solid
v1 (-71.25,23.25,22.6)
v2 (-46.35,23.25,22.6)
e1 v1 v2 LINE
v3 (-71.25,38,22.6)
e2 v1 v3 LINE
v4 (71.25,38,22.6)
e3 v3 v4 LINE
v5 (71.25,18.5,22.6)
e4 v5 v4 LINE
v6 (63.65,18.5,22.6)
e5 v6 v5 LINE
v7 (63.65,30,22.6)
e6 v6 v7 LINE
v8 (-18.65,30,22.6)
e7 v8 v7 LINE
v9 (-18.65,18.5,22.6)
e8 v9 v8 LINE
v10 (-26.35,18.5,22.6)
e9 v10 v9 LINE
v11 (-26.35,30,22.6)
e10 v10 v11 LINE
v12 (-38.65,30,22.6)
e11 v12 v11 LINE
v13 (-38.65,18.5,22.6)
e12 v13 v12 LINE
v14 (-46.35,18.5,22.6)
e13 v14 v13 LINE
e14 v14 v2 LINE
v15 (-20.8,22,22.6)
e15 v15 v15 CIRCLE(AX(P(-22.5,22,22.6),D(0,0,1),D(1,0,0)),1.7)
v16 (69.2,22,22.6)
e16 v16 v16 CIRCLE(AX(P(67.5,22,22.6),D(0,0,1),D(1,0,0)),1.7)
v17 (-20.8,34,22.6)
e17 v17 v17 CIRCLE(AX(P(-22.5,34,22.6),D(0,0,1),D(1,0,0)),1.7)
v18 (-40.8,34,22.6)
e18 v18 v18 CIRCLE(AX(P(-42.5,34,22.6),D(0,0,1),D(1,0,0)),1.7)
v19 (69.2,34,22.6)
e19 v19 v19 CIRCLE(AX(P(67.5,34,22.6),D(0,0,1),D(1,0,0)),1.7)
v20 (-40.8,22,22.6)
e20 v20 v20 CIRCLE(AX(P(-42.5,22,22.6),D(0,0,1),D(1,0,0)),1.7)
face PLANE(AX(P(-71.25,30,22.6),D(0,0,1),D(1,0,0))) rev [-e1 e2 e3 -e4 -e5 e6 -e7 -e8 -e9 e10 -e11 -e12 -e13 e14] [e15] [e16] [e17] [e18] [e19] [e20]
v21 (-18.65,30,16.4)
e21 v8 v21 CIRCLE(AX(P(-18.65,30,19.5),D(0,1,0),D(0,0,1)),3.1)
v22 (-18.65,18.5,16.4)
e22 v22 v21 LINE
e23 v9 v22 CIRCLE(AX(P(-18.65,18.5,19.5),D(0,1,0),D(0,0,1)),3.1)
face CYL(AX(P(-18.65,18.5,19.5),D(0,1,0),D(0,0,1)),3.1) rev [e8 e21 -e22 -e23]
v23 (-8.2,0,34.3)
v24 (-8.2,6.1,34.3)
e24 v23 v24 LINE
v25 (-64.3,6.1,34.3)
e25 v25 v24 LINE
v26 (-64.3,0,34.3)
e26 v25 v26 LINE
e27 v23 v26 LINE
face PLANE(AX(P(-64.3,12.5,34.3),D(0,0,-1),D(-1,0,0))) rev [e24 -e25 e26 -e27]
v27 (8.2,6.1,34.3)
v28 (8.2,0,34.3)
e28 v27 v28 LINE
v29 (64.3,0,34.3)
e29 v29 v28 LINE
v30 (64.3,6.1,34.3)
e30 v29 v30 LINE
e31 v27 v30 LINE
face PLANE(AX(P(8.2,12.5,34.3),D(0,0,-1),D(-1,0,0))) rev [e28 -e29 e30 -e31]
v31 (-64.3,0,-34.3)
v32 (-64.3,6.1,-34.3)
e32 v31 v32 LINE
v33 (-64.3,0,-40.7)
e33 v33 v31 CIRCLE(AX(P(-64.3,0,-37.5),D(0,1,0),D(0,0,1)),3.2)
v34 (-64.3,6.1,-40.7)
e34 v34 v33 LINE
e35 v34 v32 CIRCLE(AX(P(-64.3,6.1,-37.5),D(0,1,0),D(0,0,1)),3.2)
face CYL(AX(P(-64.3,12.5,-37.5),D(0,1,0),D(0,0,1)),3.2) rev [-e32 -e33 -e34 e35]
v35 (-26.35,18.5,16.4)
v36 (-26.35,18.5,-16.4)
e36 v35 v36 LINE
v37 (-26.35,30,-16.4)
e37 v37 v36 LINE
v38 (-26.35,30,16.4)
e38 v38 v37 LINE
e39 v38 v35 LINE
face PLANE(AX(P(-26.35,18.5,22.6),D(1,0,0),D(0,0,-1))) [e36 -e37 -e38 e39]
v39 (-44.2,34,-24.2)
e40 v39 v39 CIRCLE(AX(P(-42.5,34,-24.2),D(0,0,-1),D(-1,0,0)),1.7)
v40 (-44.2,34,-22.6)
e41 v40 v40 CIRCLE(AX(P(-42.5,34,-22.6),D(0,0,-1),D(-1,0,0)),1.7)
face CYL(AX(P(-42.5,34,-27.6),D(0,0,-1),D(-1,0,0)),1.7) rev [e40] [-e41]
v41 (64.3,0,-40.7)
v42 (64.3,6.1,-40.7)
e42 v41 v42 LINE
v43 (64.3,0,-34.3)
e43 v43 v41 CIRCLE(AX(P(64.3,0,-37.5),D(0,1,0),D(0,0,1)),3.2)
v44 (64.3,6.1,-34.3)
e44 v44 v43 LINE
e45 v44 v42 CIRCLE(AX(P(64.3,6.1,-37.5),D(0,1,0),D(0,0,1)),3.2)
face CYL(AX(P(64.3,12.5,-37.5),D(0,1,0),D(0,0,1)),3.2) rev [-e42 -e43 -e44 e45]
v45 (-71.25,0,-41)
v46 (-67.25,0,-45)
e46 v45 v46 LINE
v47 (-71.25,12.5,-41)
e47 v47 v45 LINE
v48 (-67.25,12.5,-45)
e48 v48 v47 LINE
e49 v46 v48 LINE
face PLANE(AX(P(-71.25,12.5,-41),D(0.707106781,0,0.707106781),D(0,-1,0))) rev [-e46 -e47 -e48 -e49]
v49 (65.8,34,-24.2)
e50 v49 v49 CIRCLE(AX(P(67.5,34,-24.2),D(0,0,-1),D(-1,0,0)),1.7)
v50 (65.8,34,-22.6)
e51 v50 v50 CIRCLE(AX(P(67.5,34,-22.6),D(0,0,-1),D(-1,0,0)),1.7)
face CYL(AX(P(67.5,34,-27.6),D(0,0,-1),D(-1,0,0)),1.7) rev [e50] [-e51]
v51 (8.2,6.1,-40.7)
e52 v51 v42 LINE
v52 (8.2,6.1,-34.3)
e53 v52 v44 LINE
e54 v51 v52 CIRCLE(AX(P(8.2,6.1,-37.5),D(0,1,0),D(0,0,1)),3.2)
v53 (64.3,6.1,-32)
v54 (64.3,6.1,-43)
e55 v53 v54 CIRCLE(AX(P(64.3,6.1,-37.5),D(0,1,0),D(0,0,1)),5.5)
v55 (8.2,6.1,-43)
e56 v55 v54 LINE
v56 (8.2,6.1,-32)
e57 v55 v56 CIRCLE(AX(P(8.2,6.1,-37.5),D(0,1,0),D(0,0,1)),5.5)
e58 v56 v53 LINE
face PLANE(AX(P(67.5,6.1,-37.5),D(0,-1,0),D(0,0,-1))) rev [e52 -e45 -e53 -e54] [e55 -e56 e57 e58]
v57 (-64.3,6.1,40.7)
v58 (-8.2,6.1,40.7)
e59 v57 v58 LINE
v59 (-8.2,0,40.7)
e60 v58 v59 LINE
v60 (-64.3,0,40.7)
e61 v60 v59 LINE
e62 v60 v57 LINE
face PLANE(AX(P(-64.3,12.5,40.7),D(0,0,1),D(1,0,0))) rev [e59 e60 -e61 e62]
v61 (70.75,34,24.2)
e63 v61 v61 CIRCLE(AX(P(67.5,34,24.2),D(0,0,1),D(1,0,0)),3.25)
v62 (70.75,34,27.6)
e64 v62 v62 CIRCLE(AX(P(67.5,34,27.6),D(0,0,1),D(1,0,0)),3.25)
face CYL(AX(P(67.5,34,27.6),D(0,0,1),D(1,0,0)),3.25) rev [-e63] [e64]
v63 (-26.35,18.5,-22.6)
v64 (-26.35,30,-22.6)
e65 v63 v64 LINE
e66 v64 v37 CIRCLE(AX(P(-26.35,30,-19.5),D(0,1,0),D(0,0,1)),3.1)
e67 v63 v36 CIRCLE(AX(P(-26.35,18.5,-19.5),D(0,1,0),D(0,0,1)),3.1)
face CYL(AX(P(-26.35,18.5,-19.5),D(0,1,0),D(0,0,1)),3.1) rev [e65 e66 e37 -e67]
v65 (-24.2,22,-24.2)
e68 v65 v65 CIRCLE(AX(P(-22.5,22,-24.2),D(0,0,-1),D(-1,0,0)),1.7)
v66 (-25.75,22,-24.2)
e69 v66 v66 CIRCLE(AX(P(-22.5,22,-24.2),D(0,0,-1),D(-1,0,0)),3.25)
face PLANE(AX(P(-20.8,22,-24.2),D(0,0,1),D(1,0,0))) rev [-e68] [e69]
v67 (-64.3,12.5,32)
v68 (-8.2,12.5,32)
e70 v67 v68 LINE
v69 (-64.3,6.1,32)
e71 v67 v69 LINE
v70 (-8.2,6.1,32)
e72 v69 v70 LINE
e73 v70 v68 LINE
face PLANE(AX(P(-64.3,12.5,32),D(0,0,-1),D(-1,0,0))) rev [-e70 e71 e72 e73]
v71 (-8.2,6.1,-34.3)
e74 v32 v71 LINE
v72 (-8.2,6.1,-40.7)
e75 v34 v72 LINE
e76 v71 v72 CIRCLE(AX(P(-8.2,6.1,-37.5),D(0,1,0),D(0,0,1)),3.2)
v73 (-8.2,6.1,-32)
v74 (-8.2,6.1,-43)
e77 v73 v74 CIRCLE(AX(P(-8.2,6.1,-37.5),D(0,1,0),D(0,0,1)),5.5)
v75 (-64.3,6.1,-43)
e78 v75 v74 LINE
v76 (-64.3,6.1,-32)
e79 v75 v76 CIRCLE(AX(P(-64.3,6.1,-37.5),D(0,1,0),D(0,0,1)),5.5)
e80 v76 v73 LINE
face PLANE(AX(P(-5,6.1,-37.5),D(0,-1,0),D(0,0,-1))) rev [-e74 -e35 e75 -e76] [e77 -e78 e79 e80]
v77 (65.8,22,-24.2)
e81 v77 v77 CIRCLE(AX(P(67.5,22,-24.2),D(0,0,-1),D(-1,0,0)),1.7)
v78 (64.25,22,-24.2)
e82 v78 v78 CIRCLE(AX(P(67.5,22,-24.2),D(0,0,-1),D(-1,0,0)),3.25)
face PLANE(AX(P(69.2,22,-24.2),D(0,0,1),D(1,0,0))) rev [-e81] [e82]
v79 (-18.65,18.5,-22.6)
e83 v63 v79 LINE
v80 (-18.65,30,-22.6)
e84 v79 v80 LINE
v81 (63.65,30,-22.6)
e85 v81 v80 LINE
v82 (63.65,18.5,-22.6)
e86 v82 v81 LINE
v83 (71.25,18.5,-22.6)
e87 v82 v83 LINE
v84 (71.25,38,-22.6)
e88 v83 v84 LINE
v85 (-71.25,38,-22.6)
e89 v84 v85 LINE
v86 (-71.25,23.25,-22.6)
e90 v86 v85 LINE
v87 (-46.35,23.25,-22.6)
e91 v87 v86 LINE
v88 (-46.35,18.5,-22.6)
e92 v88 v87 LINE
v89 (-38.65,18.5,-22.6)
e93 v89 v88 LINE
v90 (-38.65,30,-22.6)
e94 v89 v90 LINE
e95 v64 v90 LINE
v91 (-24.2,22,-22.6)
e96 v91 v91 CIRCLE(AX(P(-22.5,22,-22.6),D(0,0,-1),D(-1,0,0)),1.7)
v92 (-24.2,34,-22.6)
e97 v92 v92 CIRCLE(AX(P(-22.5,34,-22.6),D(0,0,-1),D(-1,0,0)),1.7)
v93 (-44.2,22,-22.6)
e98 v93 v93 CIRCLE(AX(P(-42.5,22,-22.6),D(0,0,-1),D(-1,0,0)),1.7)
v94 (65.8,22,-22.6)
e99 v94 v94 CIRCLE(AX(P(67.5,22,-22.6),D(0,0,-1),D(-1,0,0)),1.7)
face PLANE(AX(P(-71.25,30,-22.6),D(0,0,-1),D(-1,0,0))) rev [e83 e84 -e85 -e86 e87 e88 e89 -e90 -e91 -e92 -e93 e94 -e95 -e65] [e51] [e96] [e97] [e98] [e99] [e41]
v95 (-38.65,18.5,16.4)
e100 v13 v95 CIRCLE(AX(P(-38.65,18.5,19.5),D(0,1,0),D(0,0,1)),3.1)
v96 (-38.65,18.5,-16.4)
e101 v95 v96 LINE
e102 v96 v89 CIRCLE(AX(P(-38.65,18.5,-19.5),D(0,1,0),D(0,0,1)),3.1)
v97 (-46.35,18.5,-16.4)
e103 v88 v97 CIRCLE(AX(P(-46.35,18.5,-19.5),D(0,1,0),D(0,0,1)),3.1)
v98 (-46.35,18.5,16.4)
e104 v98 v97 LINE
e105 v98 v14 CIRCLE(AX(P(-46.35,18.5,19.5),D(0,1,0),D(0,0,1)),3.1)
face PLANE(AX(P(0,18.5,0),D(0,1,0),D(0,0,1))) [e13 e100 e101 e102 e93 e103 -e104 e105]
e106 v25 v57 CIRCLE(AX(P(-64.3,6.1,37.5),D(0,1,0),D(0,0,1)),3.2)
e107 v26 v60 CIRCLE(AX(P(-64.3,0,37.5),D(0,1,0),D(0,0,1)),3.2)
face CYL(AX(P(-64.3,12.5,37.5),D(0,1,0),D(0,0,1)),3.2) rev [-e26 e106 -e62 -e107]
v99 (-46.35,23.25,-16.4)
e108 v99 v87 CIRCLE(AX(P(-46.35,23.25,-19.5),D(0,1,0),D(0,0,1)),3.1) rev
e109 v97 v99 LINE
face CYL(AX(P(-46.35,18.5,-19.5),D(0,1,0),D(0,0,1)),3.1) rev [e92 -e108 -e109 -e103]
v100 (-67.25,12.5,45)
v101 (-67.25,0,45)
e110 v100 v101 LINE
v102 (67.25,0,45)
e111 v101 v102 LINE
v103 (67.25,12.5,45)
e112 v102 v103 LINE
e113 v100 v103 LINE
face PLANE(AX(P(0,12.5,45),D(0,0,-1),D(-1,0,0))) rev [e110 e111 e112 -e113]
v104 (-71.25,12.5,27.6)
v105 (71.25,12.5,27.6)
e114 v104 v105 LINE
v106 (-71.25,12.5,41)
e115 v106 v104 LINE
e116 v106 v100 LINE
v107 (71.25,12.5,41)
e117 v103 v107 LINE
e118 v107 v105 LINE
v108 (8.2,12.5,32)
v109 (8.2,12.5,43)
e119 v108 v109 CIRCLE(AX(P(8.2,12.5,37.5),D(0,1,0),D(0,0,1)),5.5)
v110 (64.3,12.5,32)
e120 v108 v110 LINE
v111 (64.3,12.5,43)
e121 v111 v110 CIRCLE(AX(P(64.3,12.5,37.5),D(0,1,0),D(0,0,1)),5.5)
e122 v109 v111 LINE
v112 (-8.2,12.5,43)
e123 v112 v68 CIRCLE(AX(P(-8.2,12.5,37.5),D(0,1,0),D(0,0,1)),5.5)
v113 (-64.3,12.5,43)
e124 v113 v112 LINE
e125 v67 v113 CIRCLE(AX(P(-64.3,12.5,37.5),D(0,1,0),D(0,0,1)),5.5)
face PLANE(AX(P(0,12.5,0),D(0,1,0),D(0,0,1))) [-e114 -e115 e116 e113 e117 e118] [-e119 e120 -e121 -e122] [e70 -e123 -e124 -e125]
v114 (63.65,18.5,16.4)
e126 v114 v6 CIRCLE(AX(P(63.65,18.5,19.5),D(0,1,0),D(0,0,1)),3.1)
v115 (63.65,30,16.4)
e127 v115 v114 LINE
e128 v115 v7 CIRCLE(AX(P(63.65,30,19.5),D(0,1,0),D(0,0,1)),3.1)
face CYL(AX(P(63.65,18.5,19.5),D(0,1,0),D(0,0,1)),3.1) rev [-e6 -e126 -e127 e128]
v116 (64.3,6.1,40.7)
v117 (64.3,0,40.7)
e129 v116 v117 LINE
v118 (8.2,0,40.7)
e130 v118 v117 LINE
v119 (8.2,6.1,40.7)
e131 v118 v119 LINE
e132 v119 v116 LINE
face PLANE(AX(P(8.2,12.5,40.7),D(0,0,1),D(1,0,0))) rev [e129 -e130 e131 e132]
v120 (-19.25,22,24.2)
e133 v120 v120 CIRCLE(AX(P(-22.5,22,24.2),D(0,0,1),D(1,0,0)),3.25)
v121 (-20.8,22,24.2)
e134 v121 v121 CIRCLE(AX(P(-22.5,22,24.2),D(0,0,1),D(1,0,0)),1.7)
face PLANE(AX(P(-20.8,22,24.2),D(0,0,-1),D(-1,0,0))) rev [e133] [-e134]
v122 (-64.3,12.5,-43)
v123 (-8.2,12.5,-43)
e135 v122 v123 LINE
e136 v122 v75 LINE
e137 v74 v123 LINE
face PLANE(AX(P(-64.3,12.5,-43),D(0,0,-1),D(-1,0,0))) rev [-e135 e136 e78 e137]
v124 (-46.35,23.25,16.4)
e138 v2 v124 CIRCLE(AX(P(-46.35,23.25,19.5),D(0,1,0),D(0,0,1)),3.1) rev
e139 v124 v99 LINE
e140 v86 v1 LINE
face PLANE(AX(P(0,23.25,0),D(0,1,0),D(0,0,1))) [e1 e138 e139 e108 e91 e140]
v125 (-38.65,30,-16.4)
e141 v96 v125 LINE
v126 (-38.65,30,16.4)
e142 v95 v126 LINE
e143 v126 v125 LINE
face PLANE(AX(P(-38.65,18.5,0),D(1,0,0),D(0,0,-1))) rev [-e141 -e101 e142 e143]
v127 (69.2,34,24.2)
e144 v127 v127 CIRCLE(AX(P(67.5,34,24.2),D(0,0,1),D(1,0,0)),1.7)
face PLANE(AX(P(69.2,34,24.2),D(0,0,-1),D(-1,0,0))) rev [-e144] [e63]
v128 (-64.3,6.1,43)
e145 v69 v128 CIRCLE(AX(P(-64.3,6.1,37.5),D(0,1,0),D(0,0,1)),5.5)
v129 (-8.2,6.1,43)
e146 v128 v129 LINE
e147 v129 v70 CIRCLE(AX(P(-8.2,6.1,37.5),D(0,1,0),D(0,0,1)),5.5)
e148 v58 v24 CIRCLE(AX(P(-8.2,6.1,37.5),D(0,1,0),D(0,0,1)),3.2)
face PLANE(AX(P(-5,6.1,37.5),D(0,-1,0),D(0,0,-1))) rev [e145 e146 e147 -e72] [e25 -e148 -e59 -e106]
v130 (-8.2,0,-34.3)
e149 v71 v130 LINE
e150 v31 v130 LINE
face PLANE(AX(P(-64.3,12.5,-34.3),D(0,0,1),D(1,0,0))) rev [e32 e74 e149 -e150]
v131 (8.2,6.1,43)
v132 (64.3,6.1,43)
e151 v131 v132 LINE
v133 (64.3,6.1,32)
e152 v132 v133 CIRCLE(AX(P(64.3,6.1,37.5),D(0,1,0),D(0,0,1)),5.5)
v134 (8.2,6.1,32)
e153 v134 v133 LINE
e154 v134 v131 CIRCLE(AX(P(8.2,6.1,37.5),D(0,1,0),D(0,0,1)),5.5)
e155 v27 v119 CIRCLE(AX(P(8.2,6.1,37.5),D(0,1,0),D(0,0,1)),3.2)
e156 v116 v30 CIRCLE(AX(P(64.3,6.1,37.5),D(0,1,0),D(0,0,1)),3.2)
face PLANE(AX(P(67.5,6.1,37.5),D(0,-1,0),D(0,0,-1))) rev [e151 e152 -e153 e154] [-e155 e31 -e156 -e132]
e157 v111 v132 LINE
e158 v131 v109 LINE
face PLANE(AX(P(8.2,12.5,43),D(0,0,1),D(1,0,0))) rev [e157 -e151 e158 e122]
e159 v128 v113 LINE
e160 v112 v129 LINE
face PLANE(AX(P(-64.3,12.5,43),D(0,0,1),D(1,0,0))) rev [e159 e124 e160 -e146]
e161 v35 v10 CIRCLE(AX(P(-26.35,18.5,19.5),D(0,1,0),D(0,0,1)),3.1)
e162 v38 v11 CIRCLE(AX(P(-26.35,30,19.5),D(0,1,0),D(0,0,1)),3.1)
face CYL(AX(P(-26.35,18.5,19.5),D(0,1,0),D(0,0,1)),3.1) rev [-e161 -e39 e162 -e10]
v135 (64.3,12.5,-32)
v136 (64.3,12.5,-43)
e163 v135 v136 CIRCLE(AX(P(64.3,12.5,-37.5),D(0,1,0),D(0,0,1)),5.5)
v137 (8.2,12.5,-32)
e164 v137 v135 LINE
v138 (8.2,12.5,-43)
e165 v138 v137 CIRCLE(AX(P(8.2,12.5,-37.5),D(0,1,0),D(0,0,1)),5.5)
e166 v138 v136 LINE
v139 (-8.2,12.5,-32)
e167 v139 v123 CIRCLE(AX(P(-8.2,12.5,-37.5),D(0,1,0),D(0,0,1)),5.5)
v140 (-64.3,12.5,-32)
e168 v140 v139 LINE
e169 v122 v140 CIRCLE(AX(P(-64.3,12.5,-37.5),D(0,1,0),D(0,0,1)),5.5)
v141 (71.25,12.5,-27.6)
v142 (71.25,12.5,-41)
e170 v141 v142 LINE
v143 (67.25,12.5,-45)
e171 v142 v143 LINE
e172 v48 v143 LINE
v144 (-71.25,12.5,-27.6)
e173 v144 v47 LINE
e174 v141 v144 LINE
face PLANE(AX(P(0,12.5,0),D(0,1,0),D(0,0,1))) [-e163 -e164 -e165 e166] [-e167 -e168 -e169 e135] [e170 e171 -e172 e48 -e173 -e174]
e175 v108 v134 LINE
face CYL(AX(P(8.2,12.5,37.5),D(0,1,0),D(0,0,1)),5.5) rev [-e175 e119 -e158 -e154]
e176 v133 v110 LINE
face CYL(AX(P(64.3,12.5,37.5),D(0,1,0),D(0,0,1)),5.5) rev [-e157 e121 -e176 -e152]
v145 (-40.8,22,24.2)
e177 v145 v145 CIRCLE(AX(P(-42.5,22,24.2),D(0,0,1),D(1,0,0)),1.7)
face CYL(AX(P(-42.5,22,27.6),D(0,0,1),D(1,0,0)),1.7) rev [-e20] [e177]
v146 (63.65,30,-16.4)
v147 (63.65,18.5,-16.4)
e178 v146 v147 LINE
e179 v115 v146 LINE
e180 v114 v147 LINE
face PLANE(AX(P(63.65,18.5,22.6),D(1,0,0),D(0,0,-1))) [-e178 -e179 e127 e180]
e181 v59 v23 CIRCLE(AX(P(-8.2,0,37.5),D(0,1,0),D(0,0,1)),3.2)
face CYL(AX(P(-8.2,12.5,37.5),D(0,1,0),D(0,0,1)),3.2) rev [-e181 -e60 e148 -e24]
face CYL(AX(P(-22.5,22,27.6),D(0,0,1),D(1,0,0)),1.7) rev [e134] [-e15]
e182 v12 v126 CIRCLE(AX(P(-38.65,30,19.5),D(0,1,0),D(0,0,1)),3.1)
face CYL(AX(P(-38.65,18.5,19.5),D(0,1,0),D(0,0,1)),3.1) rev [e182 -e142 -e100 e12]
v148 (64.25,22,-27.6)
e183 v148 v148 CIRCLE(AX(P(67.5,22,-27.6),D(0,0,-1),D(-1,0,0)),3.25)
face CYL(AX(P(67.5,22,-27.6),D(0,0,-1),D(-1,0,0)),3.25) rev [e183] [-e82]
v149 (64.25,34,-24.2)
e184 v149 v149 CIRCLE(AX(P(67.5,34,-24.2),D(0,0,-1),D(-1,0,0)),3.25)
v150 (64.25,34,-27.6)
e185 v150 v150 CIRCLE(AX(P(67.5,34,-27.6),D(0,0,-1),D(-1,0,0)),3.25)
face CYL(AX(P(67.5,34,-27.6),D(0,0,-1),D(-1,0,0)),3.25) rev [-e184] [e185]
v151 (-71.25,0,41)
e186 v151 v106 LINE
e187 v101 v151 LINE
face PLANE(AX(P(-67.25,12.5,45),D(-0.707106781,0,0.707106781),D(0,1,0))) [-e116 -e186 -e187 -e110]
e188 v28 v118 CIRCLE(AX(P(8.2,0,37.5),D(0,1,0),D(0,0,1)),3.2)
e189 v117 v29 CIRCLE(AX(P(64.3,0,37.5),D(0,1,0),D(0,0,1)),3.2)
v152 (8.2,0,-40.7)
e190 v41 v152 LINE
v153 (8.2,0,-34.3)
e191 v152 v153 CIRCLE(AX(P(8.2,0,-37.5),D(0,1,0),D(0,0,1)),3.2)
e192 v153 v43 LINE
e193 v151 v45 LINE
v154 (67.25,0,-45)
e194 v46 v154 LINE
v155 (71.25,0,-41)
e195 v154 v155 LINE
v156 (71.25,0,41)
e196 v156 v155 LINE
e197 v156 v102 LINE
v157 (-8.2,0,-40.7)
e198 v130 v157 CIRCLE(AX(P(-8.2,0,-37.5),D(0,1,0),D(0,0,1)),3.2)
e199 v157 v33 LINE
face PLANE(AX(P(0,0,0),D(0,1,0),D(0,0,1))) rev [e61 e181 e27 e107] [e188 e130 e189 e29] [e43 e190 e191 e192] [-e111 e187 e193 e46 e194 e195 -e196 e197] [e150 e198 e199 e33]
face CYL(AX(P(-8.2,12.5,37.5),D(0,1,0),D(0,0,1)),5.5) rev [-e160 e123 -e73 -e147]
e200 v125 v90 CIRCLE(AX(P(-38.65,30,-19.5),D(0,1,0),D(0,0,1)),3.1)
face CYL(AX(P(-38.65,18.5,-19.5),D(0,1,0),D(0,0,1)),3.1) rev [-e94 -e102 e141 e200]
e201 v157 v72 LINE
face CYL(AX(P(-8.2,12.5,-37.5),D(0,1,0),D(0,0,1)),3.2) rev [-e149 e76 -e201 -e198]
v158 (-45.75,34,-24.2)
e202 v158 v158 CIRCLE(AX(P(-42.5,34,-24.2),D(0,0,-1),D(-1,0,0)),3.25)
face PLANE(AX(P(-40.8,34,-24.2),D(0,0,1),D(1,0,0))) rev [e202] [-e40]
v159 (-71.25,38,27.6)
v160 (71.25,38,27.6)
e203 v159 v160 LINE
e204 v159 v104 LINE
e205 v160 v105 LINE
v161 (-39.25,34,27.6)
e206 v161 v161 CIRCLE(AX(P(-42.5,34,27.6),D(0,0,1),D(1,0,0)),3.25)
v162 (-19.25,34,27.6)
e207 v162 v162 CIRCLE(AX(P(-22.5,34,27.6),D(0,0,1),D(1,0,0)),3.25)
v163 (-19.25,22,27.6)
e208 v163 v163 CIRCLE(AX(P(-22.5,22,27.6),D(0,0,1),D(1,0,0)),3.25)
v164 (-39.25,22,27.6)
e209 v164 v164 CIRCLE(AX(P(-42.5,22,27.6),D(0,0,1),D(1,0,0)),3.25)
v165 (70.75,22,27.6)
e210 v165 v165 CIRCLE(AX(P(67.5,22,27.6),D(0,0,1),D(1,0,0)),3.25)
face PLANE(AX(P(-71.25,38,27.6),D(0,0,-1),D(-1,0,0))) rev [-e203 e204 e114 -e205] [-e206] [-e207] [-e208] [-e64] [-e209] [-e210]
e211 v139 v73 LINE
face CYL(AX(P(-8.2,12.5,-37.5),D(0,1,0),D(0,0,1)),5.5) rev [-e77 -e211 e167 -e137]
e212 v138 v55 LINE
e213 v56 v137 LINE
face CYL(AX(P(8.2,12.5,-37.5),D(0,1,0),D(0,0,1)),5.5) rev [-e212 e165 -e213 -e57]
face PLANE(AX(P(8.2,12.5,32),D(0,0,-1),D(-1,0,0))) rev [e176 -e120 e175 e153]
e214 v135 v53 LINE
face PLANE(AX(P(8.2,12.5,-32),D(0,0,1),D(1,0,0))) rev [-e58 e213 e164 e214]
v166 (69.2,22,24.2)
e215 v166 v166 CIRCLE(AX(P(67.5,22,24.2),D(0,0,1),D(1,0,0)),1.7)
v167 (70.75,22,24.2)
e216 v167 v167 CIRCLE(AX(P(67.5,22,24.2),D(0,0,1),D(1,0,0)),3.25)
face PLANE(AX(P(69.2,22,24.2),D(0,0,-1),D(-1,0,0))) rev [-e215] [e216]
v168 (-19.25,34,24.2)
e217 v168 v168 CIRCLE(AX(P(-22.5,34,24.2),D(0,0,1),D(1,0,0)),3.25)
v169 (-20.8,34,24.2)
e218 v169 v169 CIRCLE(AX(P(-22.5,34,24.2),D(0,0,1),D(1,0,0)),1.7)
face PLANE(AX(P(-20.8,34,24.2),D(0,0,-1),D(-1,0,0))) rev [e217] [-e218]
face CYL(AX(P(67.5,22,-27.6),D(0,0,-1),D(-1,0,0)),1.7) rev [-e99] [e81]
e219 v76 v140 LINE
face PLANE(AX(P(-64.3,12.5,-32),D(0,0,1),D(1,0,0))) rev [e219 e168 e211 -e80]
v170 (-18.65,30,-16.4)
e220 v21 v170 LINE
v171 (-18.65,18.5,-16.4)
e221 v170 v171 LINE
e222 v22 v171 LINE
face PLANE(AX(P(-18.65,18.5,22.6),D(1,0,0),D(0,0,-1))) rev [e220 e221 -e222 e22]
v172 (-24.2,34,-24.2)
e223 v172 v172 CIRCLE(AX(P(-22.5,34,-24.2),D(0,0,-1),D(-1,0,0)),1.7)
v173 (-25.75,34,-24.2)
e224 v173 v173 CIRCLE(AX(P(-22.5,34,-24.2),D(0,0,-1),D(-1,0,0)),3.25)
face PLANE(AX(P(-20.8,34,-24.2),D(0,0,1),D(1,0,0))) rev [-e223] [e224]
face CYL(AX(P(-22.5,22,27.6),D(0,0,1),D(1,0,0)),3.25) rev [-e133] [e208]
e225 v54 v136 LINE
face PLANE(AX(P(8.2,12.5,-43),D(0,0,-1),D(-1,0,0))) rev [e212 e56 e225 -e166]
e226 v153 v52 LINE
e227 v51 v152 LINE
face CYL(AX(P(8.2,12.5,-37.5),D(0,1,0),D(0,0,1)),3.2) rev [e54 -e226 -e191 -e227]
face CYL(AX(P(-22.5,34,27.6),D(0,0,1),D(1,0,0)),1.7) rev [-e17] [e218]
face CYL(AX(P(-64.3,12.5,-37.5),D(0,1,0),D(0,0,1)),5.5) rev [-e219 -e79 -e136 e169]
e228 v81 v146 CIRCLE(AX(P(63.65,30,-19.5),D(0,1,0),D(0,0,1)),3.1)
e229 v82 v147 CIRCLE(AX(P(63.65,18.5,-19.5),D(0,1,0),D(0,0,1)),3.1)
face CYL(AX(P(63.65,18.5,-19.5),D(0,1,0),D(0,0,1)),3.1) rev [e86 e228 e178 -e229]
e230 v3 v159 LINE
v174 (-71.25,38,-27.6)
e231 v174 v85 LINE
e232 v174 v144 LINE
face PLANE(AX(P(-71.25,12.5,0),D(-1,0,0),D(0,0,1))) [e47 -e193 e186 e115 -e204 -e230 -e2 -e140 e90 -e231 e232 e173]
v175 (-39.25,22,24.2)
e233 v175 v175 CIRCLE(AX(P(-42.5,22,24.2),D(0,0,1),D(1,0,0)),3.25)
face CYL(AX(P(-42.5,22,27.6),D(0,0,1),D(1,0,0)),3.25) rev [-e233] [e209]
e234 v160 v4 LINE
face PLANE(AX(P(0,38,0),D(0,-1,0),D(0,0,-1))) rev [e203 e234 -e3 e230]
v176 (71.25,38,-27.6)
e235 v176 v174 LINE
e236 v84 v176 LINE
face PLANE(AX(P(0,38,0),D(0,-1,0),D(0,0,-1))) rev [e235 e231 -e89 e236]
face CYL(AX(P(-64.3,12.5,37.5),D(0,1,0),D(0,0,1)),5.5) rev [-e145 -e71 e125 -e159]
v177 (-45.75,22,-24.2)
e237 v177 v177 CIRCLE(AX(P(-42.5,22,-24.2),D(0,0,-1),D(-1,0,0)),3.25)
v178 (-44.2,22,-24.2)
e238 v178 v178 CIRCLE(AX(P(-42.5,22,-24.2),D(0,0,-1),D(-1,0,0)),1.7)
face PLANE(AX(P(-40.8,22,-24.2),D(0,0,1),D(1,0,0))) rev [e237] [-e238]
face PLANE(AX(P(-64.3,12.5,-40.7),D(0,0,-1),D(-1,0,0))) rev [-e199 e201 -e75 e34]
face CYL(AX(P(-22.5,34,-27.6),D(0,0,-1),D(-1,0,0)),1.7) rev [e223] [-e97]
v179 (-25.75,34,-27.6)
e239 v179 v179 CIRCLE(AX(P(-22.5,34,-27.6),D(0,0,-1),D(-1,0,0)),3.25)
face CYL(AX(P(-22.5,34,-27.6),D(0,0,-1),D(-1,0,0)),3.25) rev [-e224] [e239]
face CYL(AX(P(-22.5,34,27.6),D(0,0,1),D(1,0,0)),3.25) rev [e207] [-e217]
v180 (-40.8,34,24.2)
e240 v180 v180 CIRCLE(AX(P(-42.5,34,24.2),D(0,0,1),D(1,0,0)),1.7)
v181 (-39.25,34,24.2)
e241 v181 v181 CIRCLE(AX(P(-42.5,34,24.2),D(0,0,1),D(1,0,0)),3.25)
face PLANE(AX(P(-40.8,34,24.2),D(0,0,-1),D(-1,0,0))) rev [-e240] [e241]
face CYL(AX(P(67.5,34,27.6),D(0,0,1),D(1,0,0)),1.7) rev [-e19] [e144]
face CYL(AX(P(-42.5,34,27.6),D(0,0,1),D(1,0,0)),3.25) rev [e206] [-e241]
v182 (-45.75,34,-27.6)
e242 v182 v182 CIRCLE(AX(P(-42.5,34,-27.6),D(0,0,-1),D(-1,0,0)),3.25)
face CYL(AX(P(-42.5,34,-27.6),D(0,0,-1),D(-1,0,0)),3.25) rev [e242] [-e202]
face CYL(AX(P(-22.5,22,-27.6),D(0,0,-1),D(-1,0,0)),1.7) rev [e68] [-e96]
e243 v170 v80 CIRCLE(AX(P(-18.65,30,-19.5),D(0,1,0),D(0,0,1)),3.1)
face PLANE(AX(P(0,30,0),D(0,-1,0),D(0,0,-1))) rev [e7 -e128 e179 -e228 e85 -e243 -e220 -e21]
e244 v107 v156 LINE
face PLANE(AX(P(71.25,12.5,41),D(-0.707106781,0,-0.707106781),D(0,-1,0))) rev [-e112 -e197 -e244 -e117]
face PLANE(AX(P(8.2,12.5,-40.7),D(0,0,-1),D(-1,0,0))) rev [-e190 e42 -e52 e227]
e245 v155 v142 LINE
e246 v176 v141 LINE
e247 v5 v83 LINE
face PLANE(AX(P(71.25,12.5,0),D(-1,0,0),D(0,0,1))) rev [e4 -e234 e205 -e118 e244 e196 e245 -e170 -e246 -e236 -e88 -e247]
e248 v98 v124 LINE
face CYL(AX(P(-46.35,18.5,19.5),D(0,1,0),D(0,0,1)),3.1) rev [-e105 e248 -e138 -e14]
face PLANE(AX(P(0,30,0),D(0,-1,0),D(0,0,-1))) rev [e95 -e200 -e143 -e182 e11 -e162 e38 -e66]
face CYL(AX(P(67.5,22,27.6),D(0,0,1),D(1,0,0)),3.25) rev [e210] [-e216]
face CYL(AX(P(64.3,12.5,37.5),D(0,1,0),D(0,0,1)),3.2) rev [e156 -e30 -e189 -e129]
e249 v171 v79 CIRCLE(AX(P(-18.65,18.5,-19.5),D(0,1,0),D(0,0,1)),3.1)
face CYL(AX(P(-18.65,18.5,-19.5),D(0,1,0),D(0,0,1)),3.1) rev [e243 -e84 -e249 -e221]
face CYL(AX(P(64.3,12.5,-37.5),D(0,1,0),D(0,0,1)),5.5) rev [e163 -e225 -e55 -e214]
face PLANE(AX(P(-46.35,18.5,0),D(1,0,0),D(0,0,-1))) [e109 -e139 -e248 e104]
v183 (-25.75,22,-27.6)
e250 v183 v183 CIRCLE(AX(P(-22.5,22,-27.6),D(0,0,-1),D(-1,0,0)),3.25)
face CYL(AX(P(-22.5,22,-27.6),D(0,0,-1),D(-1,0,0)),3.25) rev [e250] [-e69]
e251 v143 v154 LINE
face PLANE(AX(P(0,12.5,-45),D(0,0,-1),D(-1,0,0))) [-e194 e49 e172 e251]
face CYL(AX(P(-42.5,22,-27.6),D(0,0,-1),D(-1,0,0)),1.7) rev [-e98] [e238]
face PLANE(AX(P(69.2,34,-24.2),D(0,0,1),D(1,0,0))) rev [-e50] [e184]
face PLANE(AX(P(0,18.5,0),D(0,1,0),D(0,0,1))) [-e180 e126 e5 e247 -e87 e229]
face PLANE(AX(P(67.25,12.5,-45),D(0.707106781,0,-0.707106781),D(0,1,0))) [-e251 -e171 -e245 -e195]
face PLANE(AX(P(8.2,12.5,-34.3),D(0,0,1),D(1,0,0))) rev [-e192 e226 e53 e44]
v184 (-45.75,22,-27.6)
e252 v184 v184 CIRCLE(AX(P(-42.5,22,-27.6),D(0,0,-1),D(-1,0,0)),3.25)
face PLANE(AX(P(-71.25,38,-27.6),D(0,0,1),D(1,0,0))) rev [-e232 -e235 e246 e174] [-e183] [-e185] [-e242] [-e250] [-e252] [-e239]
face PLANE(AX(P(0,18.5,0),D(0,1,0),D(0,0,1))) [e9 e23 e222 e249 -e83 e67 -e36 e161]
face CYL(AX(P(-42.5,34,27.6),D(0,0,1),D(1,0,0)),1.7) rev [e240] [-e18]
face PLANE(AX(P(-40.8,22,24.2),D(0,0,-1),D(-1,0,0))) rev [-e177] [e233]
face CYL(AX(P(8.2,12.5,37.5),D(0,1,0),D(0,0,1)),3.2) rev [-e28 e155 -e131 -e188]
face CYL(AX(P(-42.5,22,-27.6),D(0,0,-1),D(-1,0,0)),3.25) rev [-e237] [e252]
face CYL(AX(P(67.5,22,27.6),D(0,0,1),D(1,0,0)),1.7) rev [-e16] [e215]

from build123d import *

# Parameters (mm, degrees)
SKETCH1_W                                      = 142.5
SKETCH1_H                                      = 90
BOSS_EXTRUDE1_DEPTH                            = 12.5
CHAMFER1_SIZE                                  = 4
SKETCH3_W                                      = 142.5
SKETCH3_H                                      = 55.2
BOSS_EXTRUDE2_DEPTH                            = 25.5
SKETCH7_W                                      = 142.5
SKETCH7_H                                      = 45.2
CUT_EXTRUDE4_DEPTH                             = 8
SKETCH8_W                                      = 7.7
SKETCH8_H                                      = 32.8
SKETCH8_H_2                                    = 6.2
SKETCH8_H_3                                    = 45.2
CUT_EXTRUDE5_DEPTH                             = 11.5
SKETCH9_W                                      = 24.9
SKETCH9_H                                      = 45.2
CUT_EXTRUDE6_DEPTH                             = 6.75
CBORE_START                                    = 24.2
CBORE_FOR_M3_HEX_SOCKET_HEAD_CAP_SCR_2_R       = 3.25
CBORE_FOR_M3_HEX_SOCKET_HEAD_CAP_SCREW1_DEPTH  = 3.4
CBORE_START_2                                  = 22.6
CBORE_FOR_M3_HEX_SOCKET_HEAD_CAP_SCR_3_O_R     = 1.7
CBORE_FOR_M3_HEX_SOCKET_HEAD_CAP_SCR_3_DEPTH   = 1.6
CBORE_SLOT_FOR_M6_HEX_SOCKET_HEAD_CAP_SC_DEPTH = 12.5
CBORE_START_3                                  = 6.1
CBORE_SLOT_FOR_M6_HEX_SOCKET_HEAD_CA_3_DEPTH   = 6.4


# Read off the part's stored shape, not the designer's step: CBORE for M3 Hex Socket Head Cap Screw1, CBORE SLOT for M6 Hex Socket Head Cap Screw1
with BuildPart() as part:
    # Sketch1 → Boss-Extrude1 (new body)
    with BuildSketch(Plane(origin=(0, 0, 0), x_dir=(1, 0, 0), z_dir=(0, 1, 0))):
        Rectangle(SKETCH1_W, SKETCH1_H)
    extrude(amount=BOSS_EXTRUDE1_DEPTH)

    # Chamfer1
    chamfer1_edges = [part.edges().sort_by_distance(p)[0] for p in [
        (-71.25, 6.25, 45),
        (-71.25, 6.25, -45),
        (71.25, 6.25, -45),
        (71.25, 6.25, 45),
    ]]
    chamfer(chamfer1_edges, length=CHAMFER1_SIZE)

    # Sketch3 → Boss-Extrude2 (add)
    with BuildSketch(Plane(origin=(0, 12.5, 0), x_dir=(1, 0, 0), z_dir=(0, 1, 0))):
        Rectangle(SKETCH3_W, SKETCH3_H)
    extrude(amount=BOSS_EXTRUDE2_DEPTH)

    # Sketch7 → Cut-Extrude4 (cut)
    with BuildSketch(Plane(origin=(0, 38, 0), x_dir=(1, 0, 0), z_dir=(0, 1, 0))):
        Rectangle(SKETCH7_W, SKETCH7_H)
    extrude(amount=-CUT_EXTRUDE4_DEPTH, mode=Mode.SUBTRACT)

    # Sketch8 → Cut-Extrude5 (cut)
    with BuildSketch(Plane(origin=(0, 30, 0), x_dir=(1, 0, 0), z_dir=(0, 1, 0))):
        with BuildLine():
            ThreePointArc((-46.35, 22.6), (-49.45, 19.5), (-46.35, 16.4))
            Line((-46.35, 16.4), (-46.35, 22.6))
        make_face()
        with BuildLine():
            Line((-38.65, 22.6), (-38.65, 16.4))
            ThreePointArc((-38.65, 16.4), (-35.55, 19.5), (-38.65, 22.6))
        make_face()
        with Locations((-42.5, 0)):
            Rectangle(SKETCH8_W, SKETCH8_H)
        with Locations((-42.5, 19.5)):
            Rectangle(SKETCH8_W, SKETCH8_H_2)
        with BuildLine():
            ThreePointArc((-46.35, -16.4), (-49.45, -19.5), (-46.35, -22.6))
            Line((-46.35, -22.6), (-46.35, -16.4))
        make_face()
        with BuildLine():
            Line((-38.65, -16.4), (-38.65, -22.6))
            ThreePointArc((-38.65, -22.6), (-35.55, -19.5), (-38.65, -16.4))
        make_face()
        with Locations((-42.5, -19.5)):
            Rectangle(SKETCH8_W, SKETCH8_H_2)
        with Locations((-22.5, 0)):
            Rectangle(SKETCH8_W, SKETCH8_H_3)
        with BuildLine():
            Line((-26.35, 16.4), (-18.65, 16.4))
            ThreePointArc((-18.65, 16.4), (-15.55, 19.5), (-18.65, 22.6))
            Line((-18.65, 22.6), (-26.35, 22.6))
            ThreePointArc((-26.35, 22.6), (-29.45, 19.5), (-26.35, 16.4))
        make_face()
        with BuildLine():
            Line((-26.35, -22.6), (-18.65, -22.6))
            ThreePointArc((-18.65, -22.6), (-15.55, -19.5), (-18.65, -16.4))
            Line((-18.65, -16.4), (-26.35, -16.4))
            ThreePointArc((-26.35, -16.4), (-29.45, -19.5), (-26.35, -22.6))
        make_face()
        with Locations((67.5, 0)):
            Rectangle(SKETCH8_W, SKETCH8_H_3)
        with BuildLine():
            Line((63.65, 16.4), (71.35, 16.4))
            ThreePointArc((71.35, 16.4), (74.45, 19.5), (71.35, 22.6))
            Line((71.35, 22.6), (63.65, 22.6))
            ThreePointArc((63.65, 22.6), (60.55, 19.5), (63.65, 16.4))
        make_face()
        with BuildLine():
            Line((63.65, -22.6), (71.35, -22.6))
            ThreePointArc((71.35, -22.6), (74.45, -19.5), (71.35, -16.4))
            Line((71.35, -16.4), (63.65, -16.4))
            ThreePointArc((63.65, -16.4), (60.55, -19.5), (63.65, -22.6))
        make_face()
    extrude(amount=-CUT_EXTRUDE5_DEPTH, mode=Mode.SUBTRACT)

    # Sketch9 → Cut-Extrude6 (cut)
    with BuildSketch(Plane(origin=(0, 30, 0), x_dir=(1, 0, 0), z_dir=(0, 1, 0))):
        with Locations((-58.8, 0)):
            Rectangle(SKETCH9_W, SKETCH9_H)
    extrude(amount=-CUT_EXTRUDE6_DEPTH, mode=Mode.SUBTRACT)

    # CBORE for M3 Hex Socket Head Cap Scr 2 → CBORE for M3 Hex Socket Head Cap Screw1 (cut)
    with BuildSketch(Plane.XY.offset(CBORE_START)):
        with Locations((-42.5, 34)):
            Circle(CBORE_FOR_M3_HEX_SOCKET_HEAD_CAP_SCR_2_R)
        with Locations((-42.5, 22)):
            Circle(CBORE_FOR_M3_HEX_SOCKET_HEAD_CAP_SCR_2_R)
        with Locations((-22.5, 22)):
            Circle(CBORE_FOR_M3_HEX_SOCKET_HEAD_CAP_SCR_2_R)
        with Locations((-22.5, 34)):
            Circle(CBORE_FOR_M3_HEX_SOCKET_HEAD_CAP_SCR_2_R)
        with Locations((67.5, 22)):
            Circle(CBORE_FOR_M3_HEX_SOCKET_HEAD_CAP_SCR_2_R)
        with Locations((67.5, 34)):
            Circle(CBORE_FOR_M3_HEX_SOCKET_HEAD_CAP_SCR_2_R)
    cbore_for_m3_hex_socket_head_cap_screw1 = extrude(amount=CBORE_FOR_M3_HEX_SOCKET_HEAD_CAP_SCREW1_DEPTH, mode=Mode.SUBTRACT)

    # CBORE for M3 Hex Socket Head Cap Scr 3 o → CBORE for M3 Hex Socket Head Cap Scr 3 (cut)
    with BuildSketch(Plane.XY.offset(CBORE_START_2)):
        with Locations((-42.5, 34)):
            Circle(CBORE_FOR_M3_HEX_SOCKET_HEAD_CAP_SCR_3_O_R)
        with Locations((-42.5, 22)):
            Circle(CBORE_FOR_M3_HEX_SOCKET_HEAD_CAP_SCR_3_O_R)
        with Locations((-22.5, 22)):
            Circle(CBORE_FOR_M3_HEX_SOCKET_HEAD_CAP_SCR_3_O_R)
        with Locations((-22.5, 34)):
            Circle(CBORE_FOR_M3_HEX_SOCKET_HEAD_CAP_SCR_3_O_R)
        with Locations((67.5, 22)):
            Circle(CBORE_FOR_M3_HEX_SOCKET_HEAD_CAP_SCR_3_O_R)
        with Locations((67.5, 34)):
            Circle(CBORE_FOR_M3_HEX_SOCKET_HEAD_CAP_SCR_3_O_R)
    cbore_for_m3_hex_socket_head_cap_scr_3 = extrude(amount=CBORE_FOR_M3_HEX_SOCKET_HEAD_CAP_SCR_3_DEPTH, mode=Mode.SUBTRACT)

    # Mirror1: CBORE for M3 Hex Socket Head Cap Screw1, CBORE for M3 Hex Socket Head Cap Scr 3 across plane
    add(cbore_for_m3_hex_socket_head_cap_screw1.mirror(Plane.XY), mode=Mode.SUBTRACT)
    add(cbore_for_m3_hex_socket_head_cap_scr_3.mirror(Plane.XY), mode=Mode.SUBTRACT)

    # CBORE SLOT for M6 Hex Socket Head Ca 2 → CBORE SLOT for M6 Hex Socket Head Cap Screw1 (cut)
    with BuildSketch(Plane(origin=(0, 0, 0), x_dir=(1, 0, 0), z_dir=(0, 1, 0))):
        with BuildLine():
            Line((8.2, -40.7), (64.3, -40.7))
            ThreePointArc((64.3, -40.7), (67.5, -37.5), (64.3, -34.3))
            Line((64.3, -34.3), (8.2, -34.3))
            ThreePointArc((8.2, -34.3), (5, -37.5), (8.2, -40.7))
        make_face()
        with BuildLine():
            ThreePointArc((-8.2, -40.7), (-5, -37.5), (-8.2, -34.3))
            Line((-8.2, -34.3), (-64.3, -34.3))
            ThreePointArc((-64.3, -34.3), (-67.5, -37.5), (-64.3, -40.7))
            Line((-64.3, -40.7), (-8.2, -40.7))
        make_face()
        with BuildLine():
            Line((8.2, 34.3), (64.3, 34.3))
            ThreePointArc((64.3, 34.3), (67.5, 37.5), (64.3, 40.7))
            Line((64.3, 40.7), (8.2, 40.7))
            ThreePointArc((8.2, 40.7), (5, 37.5), (8.2, 34.3))
        make_face()
        with BuildLine():
            ThreePointArc((-8.2, 34.3), (-5, 37.5), (-8.2, 40.7))
            Line((-8.2, 40.7), (-64.3, 40.7))
            ThreePointArc((-64.3, 40.7), (-67.5, 37.5), (-64.3, 34.3))
            Line((-64.3, 34.3), (-8.2, 34.3))
        make_face()
    extrude(amount=CBORE_SLOT_FOR_M6_HEX_SOCKET_HEAD_CAP_SC_DEPTH, mode=Mode.SUBTRACT)

    # CBORE SLOT for M6 Hex Socket Head Ca 3 o → CBORE SLOT for M6 Hex Socket Head Ca 3 (cut)
    # profile 1 of 4: a face of its own
    with BuildSketch(Plane(origin=(0, 0, 0), x_dir=(1, 0, 0), z_dir=(0, 1, 0)).offset(CBORE_START_3)):
        with BuildLine():
            Line((8.2, -43), (64.3, -43))
            ThreePointArc((64.3, -43), (69.8, -37.5), (64.3, -32))
            Line((64.3, -32), (8.2, -32))
            ThreePointArc((8.2, -32), (2.7, -37.5), (8.2, -43))
        make_face()
        with BuildLine():
            ThreePointArc((64.3, -34.3), (67.5, -37.5), (64.3, -40.7))
            Line((64.3, -40.7), (8.2, -40.7))
            ThreePointArc((8.2, -40.7), (5, -37.5), (8.2, -34.3))
            Line((8.2, -34.3), (64.3, -34.3))
        make_face(mode=Mode.SUBTRACT)
    # profile 2 of 4: a face of its own
    with BuildSketch(Plane(origin=(0, 0, 0), x_dir=(1, 0, 0), z_dir=(0, 1, 0)).offset(CBORE_START_3)):
        with BuildLine():
            ThreePointArc((-8.2, -43), (-2.7, -37.5), (-8.2, -32))
            Line((-8.2, -32), (-64.3, -32))
            ThreePointArc((-64.3, -32), (-69.8, -37.5), (-64.3, -43))
            Line((-64.3, -43), (-8.2, -43))
        make_face()
        with BuildLine():
            Line((-64.3, -34.3), (-8.2, -34.3))
            ThreePointArc((-8.2, -34.3), (-5, -37.5), (-8.2, -40.7))
            Line((-8.2, -40.7), (-64.3, -40.7))
            ThreePointArc((-64.3, -40.7), (-67.5, -37.5), (-64.3, -34.3))
        make_face(mode=Mode.SUBTRACT)
    # profile 3 of 4: a face of its own
    with BuildSketch(Plane(origin=(0, 0, 0), x_dir=(1, 0, 0), z_dir=(0, 1, 0)).offset(CBORE_START_3)):
        with BuildLine():
            Line((8.2, 32), (64.3, 32))
            ThreePointArc((64.3, 32), (69.8, 37.5), (64.3, 43))
            Line((64.3, 43), (8.2, 43))
            ThreePointArc((8.2, 43), (2.7, 37.5), (8.2, 32))
        make_face()
        with BuildLine():
            ThreePointArc((64.3, 40.7), (67.5, 37.5), (64.3, 34.3))
            Line((64.3, 34.3), (8.2, 34.3))
            ThreePointArc((8.2, 34.3), (5, 37.5), (8.2, 40.7))
            Line((8.2, 40.7), (64.3, 40.7))
        make_face(mode=Mode.SUBTRACT)
    # profile 4 of 4: a face of its own
    with BuildSketch(Plane(origin=(0, 0, 0), x_dir=(1, 0, 0), z_dir=(0, 1, 0)).offset(CBORE_START_3)):
        with BuildLine():
            ThreePointArc((-8.2, 32), (-2.7, 37.5), (-8.2, 43))
            Line((-8.2, 43), (-64.3, 43))
            ThreePointArc((-64.3, 43), (-69.8, 37.5), (-64.3, 32))
            Line((-64.3, 32), (-8.2, 32))
        make_face()
        with BuildLine():
            Line((-64.3, 40.7), (-8.2, 40.7))
            ThreePointArc((-8.2, 40.7), (-5, 37.5), (-8.2, 34.3))
            Line((-8.2, 34.3), (-64.3, 34.3))
            ThreePointArc((-64.3, 34.3), (-67.5, 37.5), (-64.3, 40.7))
        make_face(mode=Mode.SUBTRACT)
    extrude(amount=CBORE_SLOT_FOR_M6_HEX_SOCKET_HEAD_CA_3_DEPTH, mode=Mode.SUBTRACT)


solid = part.part
